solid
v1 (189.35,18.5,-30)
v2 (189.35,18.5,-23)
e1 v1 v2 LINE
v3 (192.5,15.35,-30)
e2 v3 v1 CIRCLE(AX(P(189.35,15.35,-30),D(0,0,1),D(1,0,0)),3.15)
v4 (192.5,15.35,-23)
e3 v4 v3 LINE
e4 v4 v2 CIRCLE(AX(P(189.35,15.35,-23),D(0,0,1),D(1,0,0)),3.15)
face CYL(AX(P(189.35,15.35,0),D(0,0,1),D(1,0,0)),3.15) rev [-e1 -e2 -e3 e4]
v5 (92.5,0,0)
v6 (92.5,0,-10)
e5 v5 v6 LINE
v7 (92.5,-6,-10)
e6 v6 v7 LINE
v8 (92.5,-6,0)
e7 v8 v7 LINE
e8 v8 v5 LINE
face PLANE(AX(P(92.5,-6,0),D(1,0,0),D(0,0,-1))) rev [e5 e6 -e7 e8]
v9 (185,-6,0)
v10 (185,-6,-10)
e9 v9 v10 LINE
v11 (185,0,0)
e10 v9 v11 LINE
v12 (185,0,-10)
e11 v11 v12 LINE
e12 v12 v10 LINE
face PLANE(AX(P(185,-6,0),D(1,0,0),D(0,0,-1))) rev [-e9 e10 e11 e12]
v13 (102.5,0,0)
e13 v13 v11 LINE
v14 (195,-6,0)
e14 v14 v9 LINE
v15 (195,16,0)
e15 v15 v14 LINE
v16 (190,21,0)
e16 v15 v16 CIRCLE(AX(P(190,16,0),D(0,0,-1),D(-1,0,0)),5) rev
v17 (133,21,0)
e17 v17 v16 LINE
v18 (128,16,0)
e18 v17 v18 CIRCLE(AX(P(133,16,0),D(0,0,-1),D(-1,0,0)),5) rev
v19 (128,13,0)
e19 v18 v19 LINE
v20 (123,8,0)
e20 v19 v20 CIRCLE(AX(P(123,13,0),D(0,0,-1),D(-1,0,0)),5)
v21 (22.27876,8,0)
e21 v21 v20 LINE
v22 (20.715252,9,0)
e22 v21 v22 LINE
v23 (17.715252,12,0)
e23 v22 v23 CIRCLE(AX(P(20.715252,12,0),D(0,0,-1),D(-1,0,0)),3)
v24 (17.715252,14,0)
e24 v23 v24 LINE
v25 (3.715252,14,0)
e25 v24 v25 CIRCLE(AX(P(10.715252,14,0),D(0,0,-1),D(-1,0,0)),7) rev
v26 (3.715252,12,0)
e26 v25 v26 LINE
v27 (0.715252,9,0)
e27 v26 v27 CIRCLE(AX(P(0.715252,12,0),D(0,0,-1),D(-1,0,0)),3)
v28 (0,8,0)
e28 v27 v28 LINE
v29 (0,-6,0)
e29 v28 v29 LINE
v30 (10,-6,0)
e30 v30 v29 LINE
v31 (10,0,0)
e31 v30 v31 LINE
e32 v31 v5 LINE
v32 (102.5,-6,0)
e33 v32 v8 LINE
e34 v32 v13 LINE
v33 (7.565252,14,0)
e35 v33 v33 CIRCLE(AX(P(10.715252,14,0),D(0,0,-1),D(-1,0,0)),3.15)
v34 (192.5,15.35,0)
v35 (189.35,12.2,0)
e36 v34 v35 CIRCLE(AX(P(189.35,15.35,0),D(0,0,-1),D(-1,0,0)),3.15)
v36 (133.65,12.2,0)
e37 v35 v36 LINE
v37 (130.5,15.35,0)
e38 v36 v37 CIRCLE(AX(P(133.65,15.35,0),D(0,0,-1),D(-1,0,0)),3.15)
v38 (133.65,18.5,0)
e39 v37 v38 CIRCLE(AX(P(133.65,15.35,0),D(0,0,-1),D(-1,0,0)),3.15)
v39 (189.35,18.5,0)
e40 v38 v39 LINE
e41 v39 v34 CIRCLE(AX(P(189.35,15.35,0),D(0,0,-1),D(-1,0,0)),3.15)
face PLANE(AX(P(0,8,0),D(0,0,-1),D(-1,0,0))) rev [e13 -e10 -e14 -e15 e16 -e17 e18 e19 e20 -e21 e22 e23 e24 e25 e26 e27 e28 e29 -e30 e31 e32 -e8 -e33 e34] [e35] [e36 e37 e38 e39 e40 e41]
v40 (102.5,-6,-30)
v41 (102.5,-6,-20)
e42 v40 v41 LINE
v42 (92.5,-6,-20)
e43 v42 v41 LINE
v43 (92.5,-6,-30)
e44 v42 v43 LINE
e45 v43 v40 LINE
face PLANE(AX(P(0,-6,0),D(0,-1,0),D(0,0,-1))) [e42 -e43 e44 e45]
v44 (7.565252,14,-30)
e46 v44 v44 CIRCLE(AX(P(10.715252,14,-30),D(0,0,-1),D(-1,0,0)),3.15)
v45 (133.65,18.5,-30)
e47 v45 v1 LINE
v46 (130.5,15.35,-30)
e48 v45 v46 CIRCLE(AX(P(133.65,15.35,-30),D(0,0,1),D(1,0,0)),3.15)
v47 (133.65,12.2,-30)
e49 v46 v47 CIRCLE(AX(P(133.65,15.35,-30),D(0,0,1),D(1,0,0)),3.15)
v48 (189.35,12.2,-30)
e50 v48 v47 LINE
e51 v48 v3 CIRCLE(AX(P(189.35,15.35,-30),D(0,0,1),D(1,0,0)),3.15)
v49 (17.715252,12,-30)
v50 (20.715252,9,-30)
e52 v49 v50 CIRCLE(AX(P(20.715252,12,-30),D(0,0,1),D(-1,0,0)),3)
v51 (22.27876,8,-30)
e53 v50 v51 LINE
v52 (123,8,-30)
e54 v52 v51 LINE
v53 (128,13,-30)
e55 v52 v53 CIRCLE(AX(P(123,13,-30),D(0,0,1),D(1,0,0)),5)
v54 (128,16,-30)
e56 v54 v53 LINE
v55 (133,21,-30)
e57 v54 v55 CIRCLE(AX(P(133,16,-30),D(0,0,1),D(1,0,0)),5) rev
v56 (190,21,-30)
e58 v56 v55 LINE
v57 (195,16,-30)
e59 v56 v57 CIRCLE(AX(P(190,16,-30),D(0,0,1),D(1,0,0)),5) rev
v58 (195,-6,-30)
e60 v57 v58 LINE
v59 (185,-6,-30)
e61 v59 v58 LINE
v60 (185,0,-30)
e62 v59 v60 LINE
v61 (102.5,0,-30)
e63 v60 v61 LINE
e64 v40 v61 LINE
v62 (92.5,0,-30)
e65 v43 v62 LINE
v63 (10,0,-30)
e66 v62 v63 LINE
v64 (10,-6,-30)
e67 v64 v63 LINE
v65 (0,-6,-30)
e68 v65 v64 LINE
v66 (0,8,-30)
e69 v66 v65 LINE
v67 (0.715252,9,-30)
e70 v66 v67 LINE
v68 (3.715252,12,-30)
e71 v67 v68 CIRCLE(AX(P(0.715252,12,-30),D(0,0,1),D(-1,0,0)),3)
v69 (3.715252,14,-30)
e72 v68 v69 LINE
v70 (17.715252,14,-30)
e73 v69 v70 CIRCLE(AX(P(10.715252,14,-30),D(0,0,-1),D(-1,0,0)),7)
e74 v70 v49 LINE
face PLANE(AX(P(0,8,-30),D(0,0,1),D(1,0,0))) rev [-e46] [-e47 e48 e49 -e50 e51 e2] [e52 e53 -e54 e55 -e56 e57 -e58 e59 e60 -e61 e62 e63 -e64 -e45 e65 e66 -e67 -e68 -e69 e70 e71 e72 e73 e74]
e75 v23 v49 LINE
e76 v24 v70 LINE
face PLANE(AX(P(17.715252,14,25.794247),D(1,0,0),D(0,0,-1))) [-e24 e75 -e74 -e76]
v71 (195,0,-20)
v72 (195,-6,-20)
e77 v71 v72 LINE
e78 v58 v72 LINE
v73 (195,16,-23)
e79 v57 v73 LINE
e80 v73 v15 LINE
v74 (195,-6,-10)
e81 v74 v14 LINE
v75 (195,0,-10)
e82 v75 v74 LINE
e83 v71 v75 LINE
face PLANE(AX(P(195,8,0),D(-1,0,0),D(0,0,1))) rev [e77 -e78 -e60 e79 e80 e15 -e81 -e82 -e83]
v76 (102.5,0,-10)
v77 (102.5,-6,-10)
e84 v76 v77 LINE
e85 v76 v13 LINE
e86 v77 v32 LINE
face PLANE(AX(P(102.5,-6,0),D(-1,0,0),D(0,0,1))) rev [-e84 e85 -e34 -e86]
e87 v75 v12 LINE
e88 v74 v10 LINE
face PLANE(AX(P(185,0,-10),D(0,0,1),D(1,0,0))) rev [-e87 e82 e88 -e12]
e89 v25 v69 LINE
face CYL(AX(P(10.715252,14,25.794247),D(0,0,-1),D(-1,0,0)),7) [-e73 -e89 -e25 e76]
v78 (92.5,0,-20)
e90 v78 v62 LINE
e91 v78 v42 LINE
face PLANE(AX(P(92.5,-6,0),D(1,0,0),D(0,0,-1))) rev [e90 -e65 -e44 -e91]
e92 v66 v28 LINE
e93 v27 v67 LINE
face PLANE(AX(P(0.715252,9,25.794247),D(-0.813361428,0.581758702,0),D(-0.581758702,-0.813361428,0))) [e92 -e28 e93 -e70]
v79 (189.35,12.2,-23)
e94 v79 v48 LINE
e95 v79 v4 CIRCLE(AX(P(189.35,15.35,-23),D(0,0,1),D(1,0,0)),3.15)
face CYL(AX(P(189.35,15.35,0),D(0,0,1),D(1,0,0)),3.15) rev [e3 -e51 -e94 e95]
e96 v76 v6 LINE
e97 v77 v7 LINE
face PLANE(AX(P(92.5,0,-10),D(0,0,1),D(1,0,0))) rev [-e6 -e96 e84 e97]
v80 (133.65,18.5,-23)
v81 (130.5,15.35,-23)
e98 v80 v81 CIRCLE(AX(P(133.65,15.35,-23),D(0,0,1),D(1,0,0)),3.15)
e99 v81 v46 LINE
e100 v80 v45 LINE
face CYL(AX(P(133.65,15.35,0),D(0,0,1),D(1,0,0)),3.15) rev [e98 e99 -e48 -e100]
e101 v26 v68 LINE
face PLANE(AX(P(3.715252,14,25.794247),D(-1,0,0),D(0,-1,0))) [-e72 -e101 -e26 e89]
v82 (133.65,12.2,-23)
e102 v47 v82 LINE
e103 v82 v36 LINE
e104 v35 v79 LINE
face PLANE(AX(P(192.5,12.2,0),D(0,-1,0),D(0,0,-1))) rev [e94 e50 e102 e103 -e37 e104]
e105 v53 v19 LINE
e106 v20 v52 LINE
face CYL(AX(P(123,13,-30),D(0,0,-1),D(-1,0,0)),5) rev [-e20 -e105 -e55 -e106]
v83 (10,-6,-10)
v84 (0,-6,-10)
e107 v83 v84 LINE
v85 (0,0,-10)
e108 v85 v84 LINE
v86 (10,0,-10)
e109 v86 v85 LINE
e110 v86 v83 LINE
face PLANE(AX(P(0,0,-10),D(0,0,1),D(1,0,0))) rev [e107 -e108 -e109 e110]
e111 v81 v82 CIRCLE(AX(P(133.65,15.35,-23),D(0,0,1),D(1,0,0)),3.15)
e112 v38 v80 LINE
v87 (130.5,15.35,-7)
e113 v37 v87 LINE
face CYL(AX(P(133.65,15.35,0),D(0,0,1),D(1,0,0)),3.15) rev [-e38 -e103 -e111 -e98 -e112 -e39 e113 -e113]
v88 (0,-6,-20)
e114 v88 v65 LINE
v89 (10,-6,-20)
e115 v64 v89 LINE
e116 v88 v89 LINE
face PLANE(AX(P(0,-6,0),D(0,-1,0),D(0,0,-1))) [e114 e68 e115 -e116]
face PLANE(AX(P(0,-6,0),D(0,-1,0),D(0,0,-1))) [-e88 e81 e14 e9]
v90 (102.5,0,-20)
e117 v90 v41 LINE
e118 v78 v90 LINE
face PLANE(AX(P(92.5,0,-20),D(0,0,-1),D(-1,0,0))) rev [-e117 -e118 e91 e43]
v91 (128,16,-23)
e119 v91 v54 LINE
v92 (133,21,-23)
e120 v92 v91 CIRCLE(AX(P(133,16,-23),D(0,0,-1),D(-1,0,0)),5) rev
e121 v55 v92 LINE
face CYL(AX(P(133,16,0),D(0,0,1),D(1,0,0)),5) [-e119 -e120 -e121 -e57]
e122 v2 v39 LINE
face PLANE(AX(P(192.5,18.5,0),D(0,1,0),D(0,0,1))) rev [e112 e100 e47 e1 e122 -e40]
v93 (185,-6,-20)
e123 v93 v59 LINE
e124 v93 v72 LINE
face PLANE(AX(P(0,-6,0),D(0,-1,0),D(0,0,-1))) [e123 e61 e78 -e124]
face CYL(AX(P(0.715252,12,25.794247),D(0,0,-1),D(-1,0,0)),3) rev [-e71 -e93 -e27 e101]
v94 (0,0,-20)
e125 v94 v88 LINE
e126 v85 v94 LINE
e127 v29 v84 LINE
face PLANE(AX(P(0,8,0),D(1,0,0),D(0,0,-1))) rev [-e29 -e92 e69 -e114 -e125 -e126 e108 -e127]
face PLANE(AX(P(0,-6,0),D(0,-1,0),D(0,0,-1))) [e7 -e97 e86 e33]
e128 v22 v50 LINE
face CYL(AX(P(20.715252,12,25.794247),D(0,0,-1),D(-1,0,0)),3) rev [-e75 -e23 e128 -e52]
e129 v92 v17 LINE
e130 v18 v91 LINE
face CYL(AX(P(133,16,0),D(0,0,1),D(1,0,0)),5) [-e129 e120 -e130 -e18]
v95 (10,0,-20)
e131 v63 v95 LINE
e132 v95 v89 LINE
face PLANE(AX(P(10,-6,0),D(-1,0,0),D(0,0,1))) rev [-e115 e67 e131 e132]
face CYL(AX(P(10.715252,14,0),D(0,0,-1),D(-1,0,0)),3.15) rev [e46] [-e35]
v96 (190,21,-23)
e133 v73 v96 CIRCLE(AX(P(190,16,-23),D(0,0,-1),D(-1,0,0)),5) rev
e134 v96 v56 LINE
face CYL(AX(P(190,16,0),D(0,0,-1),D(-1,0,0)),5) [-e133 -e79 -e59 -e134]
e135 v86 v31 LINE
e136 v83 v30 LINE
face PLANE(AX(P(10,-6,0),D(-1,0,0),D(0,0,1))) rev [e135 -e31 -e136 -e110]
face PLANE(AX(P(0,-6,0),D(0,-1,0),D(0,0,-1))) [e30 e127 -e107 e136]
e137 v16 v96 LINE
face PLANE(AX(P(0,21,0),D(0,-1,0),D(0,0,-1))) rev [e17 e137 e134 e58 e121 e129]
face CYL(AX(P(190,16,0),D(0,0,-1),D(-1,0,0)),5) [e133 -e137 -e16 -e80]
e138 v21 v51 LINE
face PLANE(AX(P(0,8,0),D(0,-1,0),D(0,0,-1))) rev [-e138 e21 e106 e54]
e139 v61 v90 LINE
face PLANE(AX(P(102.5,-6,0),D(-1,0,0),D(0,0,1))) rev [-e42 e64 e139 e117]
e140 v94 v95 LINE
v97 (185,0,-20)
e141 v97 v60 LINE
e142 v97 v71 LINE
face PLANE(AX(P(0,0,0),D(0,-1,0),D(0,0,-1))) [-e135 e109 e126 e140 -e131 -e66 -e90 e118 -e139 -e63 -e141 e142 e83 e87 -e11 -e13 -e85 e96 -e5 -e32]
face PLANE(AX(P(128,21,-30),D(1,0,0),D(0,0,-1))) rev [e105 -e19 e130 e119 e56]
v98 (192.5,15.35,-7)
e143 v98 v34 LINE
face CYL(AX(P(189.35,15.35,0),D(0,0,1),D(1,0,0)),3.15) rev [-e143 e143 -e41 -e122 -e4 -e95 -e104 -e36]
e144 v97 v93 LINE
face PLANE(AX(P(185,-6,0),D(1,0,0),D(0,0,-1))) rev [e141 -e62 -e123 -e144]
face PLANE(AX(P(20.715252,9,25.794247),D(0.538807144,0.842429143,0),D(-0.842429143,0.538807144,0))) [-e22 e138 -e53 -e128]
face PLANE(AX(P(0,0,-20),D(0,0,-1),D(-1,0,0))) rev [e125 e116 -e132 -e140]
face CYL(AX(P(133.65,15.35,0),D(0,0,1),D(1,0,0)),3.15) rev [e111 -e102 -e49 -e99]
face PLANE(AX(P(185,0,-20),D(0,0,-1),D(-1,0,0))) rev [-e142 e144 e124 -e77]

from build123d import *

# Parameters (mm, degrees)
SKETCH1_W           = 195
SKETCH1_H           = 30
BOSS_EXTRUDE1_DEPTH = 8
SKETCH2_W           = 12
SKETCH2_H           = 30
BOSS_EXTRUDE2_DEPTH = 12
SKETCH4_R           = 3.15
CUT_EXTRUDE1_DEPTH  = 199.305320151
FILLET1_R           = 4
FILLET2_R           = 6
BOSS_EXTRUDE4_DEPTH = 30
SKETCH15_W          = 67
SKETCH15_H          = 7
BOSS_EXTRUDE6_DEPTH = 13
SKETCH16_W          = 62
SKETCH16_H          = 6.3
CUT_EXTRUDE4_DEPTH  = 199.408669165
FILLET6_R           = 5
FILLET7_R           = 5
SKETCH17_W          = 10
SKETCH17_H          = 30
BOSS_EXTRUDE7_DEPTH = 6
FILLET8_R           = 3.15
FILLET9_R           = 5
SKETCH20_R          = 3.15
BOSS_EXTRUDE8_DEPTH = 16
SKETCH21_W          = 10
SKETCH21_H          = 30
BOSS_EXTRUDE9_DEPTH = 6
SKETCH22_W          = 10
SKETCH22_H          = 10
CUT_EXTRUDE5_DEPTH  = 6
FILLET10_R          = 5
FILLET11_R          = 3.15


with BuildPart() as part:
    # Sketch1 → Boss-Extrude1 (new body)
    with BuildSketch(Plane(origin=(0, 0, 0), x_dir=(1, 0, 0), z_dir=(0, 1, 0))):
        with Locations((97.5, 15)):
            Rectangle(SKETCH1_W, SKETCH1_H)
    extrude(amount=BOSS_EXTRUDE1_DEPTH)

    # Sketch2 → Boss-Extrude2 (add)
    with BuildSketch(Plane(origin=(0, 8, 0), x_dir=(1, 0, 0), z_dir=(0, 1, 0))):
        with Locations((10.715252385, 15)):
            Rectangle(SKETCH2_W, SKETCH2_H)
    extrude(amount=BOSS_EXTRUDE2_DEPTH)

    # Sketch4 → Cut-Extrude1 (cut, through all)
    with BuildSketch(Plane(origin=(0, 0, -30), x_dir=(-1, 0, 0), z_dir=(0, 0, -1))):
        with Locations((-10.715252385, 14)):
            Circle(SKETCH4_R)
    extrude(amount=-CUT_EXTRUDE1_DEPTH, mode=Mode.SUBTRACT)

    # Fillet1
    fillet1_edges = [part.edges().sort_by_distance(p)[0] for p in [
        (4.715252385, 8, -15),
        (16.715252385, 8, -15),
    ]]
    fillet(fillet1_edges, radius=FILLET1_R)

    # Fillet2
    fillet2_edges = [part.edges().sort_by_distance(p)[0] for p in [
        (4.715252385, 20, -15),
        (16.715252385, 20, -15),
    ]]
    fillet(fillet2_edges, radius=FILLET2_R - 0.0001)  # a hair under: the kernel refuses the full size

    # Sketch11 → Boss-Extrude4 (add)
    with BuildSketch(Plane(origin=(0, 0, -30), x_dir=(-1, 0, 0), z_dir=(0, 0, -1))):
        with BuildLine():
            Line((-16.715252385, 14), (-16.715252385, 12))
            ThreePointArc((-16.715252385, 12), (-17.88682526, 9.171572875), (-20.715252385, 8))
            Line((-20.715252385, 8), (-22.27876013, 8))
            Line((-22.27876013, 8), (-20.715252385, 9))
            ThreePointArc((-20.715252385, 9), (-18.593932042, 9.878679656), (-17.715252385, 12))
            Line((-17.715252385, 12), (-17.715252385, 14))
            ThreePointArc((-17.715252385, 14), (-15.664999853, 18.949747468), (-10.715252385, 21))
            ThreePointArc((-10.715252385, 21), (-5.765504917, 18.949747468), (-3.715252385, 14))
            Line((-3.715252385, 14), (-3.715252385, 12))
            ThreePointArc((-3.715252385, 12), (-2.836572729, 9.878679656), (-0.715252385, 9))
            Line((-0.715252385, 9), (0, 8))
            Line((0, 8), (-0.715252385, 8))
            ThreePointArc((-0.715252385, 8), (-3.54367951, 9.171572875), (-4.715252385, 12))
            Line((-4.715252385, 12), (-4.715252385, 14))
            ThreePointArc((-4.715252385, 14), (-6.472611698, 18.242640687), (-10.715252385, 20))
            ThreePointArc((-10.715252385, 20), (-14.957893072, 18.242640687), (-16.715252385, 14))
        make_face()
    extrude(amount=-BOSS_EXTRUDE4_DEPTH)

    # Sketch15 → Boss-Extrude6 (add)
    with BuildSketch(Plane(origin=(0, 8, 0), x_dir=(1, 0, 0), z_dir=(0, 1, 0))):
        with Locations((161.5, 26.5)):
            Rectangle(SKETCH15_W, SKETCH15_H)
        with Locations((161.5, 3.5)):
            Rectangle(SKETCH15_W, SKETCH15_H)
    extrude(amount=BOSS_EXTRUDE6_DEPTH)

    # Sketch16 → Cut-Extrude4 (cut, through all)
    with BuildSketch(Plane(origin=(0, 0, -30), x_dir=(-1, 0, 0), z_dir=(0, 0, -1))):
        with Locations((-161.5, 15.35)):
            Rectangle(SKETCH16_W, SKETCH16_H)
    extrude(amount=-CUT_EXTRUDE4_DEPTH, mode=Mode.SUBTRACT)

    # Fillet6
    fillet6_edges = [part.edges().sort_by_distance(p)[0] for p in [
        (195, 21, -26.5),
        (128, 21, -26.5),
    ]]
    fillet(fillet6_edges, radius=FILLET6_R)

    # Fillet7
    fillet7_edges = [part.edges().sort_by_distance(p)[0] for p in [
        (128, 8, -26.5),
    ]]
    fillet(fillet7_edges, radius=FILLET7_R)

    # Sketch17 → Boss-Extrude7 (add)
    with BuildSketch(Plane.XZ):
        with Locations((97.5, -15)):
            Rectangle(SKETCH17_W, SKETCH17_H)
    extrude(amount=BOSS_EXTRUDE7_DEPTH)

    # Fillet8
    fillet8_edges = [part.edges().sort_by_distance(p)[0] for p in [
        (192.5, 18.5, -3.5),
        (192.5, 12.2, -3.5),
        (130.5, 18.5, -3.5),
        (130.5, 12.2, -3.5),
    ]]
    fillet(fillet8_edges, radius=FILLET8_R - 0.0001)  # a hair under: the kernel refuses the full size

    # Fillet9
    fillet9_edges = [part.edges().sort_by_distance(p)[0] for p in [
        (128, 8, -3.5),
    ]]
    fillet(fillet9_edges, radius=FILLET9_R)

    # Sketch20 → Boss-Extrude8 (add)
    with BuildSketch(Plane.XY.offset(-23)):
        with BuildLine():
            Line((195, 0), (195, 21))
            Line((195, 21), (128, 21))
            Line((128, 21), (128, 13))
            ThreePointArc((128, 13), (126.535533906, 9.464466094), (123, 8))
            Line((123, 8), (22.27876013, 8))
            Line((22.27876013, 8), (20.715252385, 9))
            ThreePointArc((20.715252385, 9), (18.593932042, 9.878679656), (17.715252385, 12))
            Line((17.715252385, 12), (17.715252385, 14))
            ThreePointArc((17.715252385, 14), (10.715252385, 21), (3.715252385, 14))
            Line((3.715252385, 14), (3.715252385, 12))
            ThreePointArc((3.715252385, 12), (2.836572729, 9.878679656), (0.715252385, 9))
            Line((0.715252385, 9), (0, 8))
            Line((0, 8), (0, 0))
            Line((0, 0), (92.5, 0))
            Line((92.5, 0), (92.5, -6))
            Line((92.5, -6), (102.5, -6))
            Line((102.5, -6), (102.5, 0))
            Line((102.5, 0), (195, 0))
        make_face()
        with Locations(Location((10.715252385, 14, 0), (0, 0, 180))):
            Circle(SKETCH20_R, mode=Mode.SUBTRACT)
        with BuildLine():
            Line((133.65, 12.2), (189.35, 12.2))
            ThreePointArc((189.35, 12.2), (191.577386361, 13.122613639), (192.5, 15.35))
            ThreePointArc((192.5, 15.35), (191.577386361, 17.577386361), (189.35, 18.5))
            Line((189.35, 18.5), (133.65, 18.5))
            ThreePointArc((133.65, 18.5), (131.422613639, 17.577386361), (130.5, 15.35))
            ThreePointArc((130.5, 15.35), (131.422613639, 13.122613639), (133.65, 12.2))
        make_face(mode=Mode.SUBTRACT)
    extrude(amount=BOSS_EXTRUDE8_DEPTH)

    # Sketch21 → Boss-Extrude9 (add)
    with BuildSketch(Plane(origin=(0, 0, 0), x_dir=(-1, 0, 0), z_dir=(0, -1, 0))):
        with Locations((-5, 15)):
            Rectangle(SKETCH21_W, SKETCH21_H)
        with Locations((-190, 15)):
            Rectangle(SKETCH21_W, SKETCH21_H)
    extrude(amount=BOSS_EXTRUDE9_DEPTH)

    # Sketch22 → Cut-Extrude5 (cut)
    with BuildSketch(Plane(origin=(0, -6, 0), x_dir=(-1, 0, 0), z_dir=(0, -1, 0))):
        with Locations((-5, 15)):
            Rectangle(SKETCH22_W, SKETCH22_H)
        with Locations((-97.5, 15)):
            Rectangle(SKETCH22_W, SKETCH22_H)
        with Locations((-190, 15)):
            Rectangle(SKETCH22_W, SKETCH22_H)
    extrude(amount=-CUT_EXTRUDE5_DEPTH, mode=Mode.SUBTRACT)

    # Fillet10
    fillet10_edges = [part.edges().sort_by_distance(p)[0] for p in [
        (128, 21, -11.5),
        (195, 21, -11.5),
    ]]
    fillet(fillet10_edges, radius=FILLET10_R)

    # Fillet11
    fillet11_edges = [part.edges().sort_by_distance(p)[0] for p in [
        (130.5, 18.5, -26.5),
        (130.5, 12.2, -26.5),
        (192.5, 12.2, -26.5),
        (192.5, 18.5, -26.5),
    ]]
    fillet(fillet11_edges, radius=FILLET11_R - 0.0001)  # a hair under: the kernel refuses the full size


solid = part.part
